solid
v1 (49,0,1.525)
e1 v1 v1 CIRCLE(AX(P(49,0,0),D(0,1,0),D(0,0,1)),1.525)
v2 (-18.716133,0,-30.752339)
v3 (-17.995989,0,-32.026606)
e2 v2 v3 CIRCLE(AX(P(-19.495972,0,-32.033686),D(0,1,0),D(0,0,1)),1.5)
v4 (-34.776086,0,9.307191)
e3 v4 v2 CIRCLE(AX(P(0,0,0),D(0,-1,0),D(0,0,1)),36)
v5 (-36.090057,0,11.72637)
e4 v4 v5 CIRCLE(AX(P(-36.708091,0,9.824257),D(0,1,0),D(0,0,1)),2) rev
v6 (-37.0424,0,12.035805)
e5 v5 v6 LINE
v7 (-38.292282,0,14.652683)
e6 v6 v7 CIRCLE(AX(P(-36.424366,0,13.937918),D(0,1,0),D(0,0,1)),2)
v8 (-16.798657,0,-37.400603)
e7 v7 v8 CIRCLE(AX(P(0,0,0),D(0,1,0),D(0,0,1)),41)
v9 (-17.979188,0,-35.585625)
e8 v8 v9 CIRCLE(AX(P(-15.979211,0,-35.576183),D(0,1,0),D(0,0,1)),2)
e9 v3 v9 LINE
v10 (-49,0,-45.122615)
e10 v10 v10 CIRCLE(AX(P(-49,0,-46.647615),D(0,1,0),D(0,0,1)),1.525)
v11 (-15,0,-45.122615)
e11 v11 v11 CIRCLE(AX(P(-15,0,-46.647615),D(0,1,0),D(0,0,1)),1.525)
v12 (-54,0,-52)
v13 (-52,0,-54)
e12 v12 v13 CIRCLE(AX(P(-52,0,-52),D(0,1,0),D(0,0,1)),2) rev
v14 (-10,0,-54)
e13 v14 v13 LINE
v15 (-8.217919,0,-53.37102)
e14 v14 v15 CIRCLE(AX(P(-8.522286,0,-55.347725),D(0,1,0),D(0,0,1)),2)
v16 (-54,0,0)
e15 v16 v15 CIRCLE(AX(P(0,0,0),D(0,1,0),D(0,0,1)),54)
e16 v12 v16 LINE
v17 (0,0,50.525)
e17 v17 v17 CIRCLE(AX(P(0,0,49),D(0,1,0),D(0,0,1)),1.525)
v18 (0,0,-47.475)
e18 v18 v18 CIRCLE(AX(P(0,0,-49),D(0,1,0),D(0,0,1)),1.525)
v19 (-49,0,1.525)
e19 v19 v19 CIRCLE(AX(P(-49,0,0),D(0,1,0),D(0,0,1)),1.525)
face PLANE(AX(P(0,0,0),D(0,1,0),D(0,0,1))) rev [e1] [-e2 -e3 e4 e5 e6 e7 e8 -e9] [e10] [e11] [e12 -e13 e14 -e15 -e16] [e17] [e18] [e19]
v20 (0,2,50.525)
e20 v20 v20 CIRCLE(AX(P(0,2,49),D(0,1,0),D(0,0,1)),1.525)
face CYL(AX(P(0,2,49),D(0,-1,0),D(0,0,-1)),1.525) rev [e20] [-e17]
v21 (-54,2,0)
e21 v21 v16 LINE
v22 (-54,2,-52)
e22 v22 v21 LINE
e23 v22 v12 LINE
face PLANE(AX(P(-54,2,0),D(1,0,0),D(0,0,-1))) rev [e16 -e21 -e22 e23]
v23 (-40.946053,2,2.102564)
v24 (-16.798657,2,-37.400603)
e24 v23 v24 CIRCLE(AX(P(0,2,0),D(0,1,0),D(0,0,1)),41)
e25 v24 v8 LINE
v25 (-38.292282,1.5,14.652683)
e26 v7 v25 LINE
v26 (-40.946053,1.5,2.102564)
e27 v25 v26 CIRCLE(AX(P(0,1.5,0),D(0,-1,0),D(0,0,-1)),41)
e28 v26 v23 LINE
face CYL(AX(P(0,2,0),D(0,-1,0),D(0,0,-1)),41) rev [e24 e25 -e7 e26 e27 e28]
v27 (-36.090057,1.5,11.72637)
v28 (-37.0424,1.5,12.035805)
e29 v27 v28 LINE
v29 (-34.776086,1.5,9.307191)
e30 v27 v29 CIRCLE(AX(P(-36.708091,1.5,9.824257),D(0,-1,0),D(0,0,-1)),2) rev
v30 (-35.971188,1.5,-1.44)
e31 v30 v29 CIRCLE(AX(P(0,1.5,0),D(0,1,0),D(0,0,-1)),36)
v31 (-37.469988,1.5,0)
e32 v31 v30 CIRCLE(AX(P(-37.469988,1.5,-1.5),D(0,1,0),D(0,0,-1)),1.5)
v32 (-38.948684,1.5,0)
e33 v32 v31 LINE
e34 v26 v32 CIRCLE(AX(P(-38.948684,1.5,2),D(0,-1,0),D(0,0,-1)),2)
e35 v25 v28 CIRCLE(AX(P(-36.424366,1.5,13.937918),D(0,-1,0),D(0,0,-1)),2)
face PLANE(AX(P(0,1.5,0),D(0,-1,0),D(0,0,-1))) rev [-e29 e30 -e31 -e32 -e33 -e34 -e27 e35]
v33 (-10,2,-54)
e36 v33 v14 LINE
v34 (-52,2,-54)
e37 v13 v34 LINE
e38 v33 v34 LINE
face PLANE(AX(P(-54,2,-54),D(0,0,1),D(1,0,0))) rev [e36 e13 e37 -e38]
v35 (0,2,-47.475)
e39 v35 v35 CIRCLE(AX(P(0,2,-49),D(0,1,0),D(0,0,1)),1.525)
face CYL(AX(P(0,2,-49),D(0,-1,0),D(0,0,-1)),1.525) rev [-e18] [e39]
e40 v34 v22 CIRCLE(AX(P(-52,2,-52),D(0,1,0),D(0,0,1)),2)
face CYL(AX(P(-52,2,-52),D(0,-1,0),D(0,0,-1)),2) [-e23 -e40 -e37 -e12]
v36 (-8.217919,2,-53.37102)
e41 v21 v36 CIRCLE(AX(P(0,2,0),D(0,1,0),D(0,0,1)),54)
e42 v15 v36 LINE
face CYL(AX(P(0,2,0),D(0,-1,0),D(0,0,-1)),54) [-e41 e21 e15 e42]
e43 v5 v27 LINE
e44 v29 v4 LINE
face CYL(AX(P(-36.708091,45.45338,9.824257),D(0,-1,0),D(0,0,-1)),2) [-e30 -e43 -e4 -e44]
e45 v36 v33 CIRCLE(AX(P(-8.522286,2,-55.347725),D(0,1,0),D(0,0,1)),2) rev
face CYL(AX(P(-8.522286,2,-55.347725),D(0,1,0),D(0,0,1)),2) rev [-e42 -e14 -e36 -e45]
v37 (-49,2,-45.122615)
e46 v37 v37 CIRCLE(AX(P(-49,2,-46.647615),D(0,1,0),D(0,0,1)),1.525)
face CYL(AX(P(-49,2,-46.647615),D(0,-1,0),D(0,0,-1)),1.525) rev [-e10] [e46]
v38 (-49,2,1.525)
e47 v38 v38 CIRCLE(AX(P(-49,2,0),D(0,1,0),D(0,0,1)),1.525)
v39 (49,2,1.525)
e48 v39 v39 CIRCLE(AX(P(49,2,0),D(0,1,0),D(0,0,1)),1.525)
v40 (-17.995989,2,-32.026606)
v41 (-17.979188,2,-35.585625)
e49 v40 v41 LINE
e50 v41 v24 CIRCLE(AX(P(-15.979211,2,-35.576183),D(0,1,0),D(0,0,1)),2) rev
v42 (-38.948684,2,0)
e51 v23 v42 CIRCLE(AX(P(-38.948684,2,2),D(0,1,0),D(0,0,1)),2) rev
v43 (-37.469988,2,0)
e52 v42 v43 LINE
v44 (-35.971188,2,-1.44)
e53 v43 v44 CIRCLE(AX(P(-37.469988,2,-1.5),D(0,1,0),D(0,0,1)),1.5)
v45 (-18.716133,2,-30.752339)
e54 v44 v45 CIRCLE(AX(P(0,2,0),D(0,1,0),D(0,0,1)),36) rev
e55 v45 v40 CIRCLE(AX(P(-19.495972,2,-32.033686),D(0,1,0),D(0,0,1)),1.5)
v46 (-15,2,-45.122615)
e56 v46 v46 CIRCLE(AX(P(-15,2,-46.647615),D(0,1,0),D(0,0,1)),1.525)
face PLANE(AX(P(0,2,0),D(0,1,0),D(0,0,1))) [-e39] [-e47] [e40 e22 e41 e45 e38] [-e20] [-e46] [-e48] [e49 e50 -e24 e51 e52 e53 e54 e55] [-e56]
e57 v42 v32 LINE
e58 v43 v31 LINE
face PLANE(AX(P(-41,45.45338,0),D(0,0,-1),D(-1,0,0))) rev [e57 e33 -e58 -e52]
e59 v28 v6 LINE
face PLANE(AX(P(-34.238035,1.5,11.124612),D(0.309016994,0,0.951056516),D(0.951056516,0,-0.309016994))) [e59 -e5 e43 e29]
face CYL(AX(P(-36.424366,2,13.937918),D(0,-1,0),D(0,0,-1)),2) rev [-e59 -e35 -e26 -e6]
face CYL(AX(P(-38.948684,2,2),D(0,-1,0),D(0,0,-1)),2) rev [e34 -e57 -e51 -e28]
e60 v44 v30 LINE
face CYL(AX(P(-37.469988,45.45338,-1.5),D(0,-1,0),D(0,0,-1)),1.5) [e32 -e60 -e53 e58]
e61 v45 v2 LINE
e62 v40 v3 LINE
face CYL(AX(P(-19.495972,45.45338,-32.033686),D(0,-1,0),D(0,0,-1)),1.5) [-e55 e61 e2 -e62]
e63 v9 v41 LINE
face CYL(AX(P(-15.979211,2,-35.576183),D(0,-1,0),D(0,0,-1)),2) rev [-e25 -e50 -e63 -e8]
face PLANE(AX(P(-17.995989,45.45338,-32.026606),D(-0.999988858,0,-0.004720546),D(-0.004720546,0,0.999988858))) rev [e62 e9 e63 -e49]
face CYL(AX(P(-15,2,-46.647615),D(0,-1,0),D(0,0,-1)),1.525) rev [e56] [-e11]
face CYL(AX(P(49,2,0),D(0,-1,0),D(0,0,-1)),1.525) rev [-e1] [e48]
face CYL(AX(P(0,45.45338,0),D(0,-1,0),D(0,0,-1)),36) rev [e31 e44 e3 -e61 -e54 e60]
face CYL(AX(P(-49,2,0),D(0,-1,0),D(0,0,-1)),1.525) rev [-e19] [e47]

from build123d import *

# Parameters (mm, degrees)
SKETCH_1_R      = 41
SKETCH_1_R_2    = 1.525
EXTRUDE_1_DEPTH = 2
EXTRUDE_3_DEPTH = 2
FILLET_1_R      = 2
FILLET_2_R      = 2
EXTRUDE_5_DEPTH = 1.5
FILLET_3_R      = 2


with BuildPart() as part:
    # 草图1 → 凸台-拉伸1 (new body)
    with BuildSketch(Plane(origin=(0, 0, 0), x_dir=(1, 0, 0), z_dir=(0, 1, 0))):
        with BuildLine():
            Line((-54, 0), (-54, 54))
            Line((-54, 54), (-10, 54))
            Line((-10, 54), (-10, 53.065996646))
            ThreePointArc((-10, 53.065996646), (41.569219382, -34.467375879), (-54, 0))
        make_face()
        with Locations(Location((0, 0, 0), (0, 0, 270))):
            Circle(SKETCH_1_R, mode=Mode.SUBTRACT)
        with Locations(Location((-15, 46.647615159, 0), (0, 0, 270))):
            Circle(SKETCH_1_R_2, mode=Mode.SUBTRACT)
        with Locations(Location((0, 49, 0), (0, 0, 270))):
            Circle(SKETCH_1_R_2, mode=Mode.SUBTRACT)
        with Locations(Location((49, 0, 0), (0, 0, 270))):
            Circle(SKETCH_1_R_2, mode=Mode.SUBTRACT)
        with Locations(Location((0, -49, 0), (0, 0, 270))):
            Circle(SKETCH_1_R_2, mode=Mode.SUBTRACT)
        with Locations(Location((-49, 0, 0), (0, 0, 270))):
            Circle(SKETCH_1_R_2, mode=Mode.SUBTRACT)
        with Locations(Location((-49, 46.647615159, 0), (0, 0, 270))):
            Circle(SKETCH_1_R_2, mode=Mode.SUBTRACT)
    extrude(amount=EXTRUDE_1_DEPTH)

    # 草图2 → 凸台-拉伸3 (add)
    with BuildSketch(Plane(origin=(0, 0, 0), x_dir=(1, 0, 0), z_dir=(0, 1, 0))):
        with BuildLine():
            Line((-41, 0), (-37.46998799, 0))
            ThreePointArc((-37.46998799, 0), (-36.430757506, 0.418334617), (-35.971188471, 1.44))
            ThreePointArc((-35.971188471, 1.44), (-31.023847214, 18.262554696), (-18.716133348, 30.752338976))
            ThreePointArc((-18.716133348, 30.752338976), (-18.190087037, 31.295672989), (-17.99598895, 32.026605615))
            Line((-17.99598895, 32.026605615), (-17.973217018, 36.850555898))
            ThreePointArc((-17.973217018, 36.850555898), (-34.769971942, 21.726689834), (-41, 0))
        make_face()
    extrude(amount=EXTRUDE_3_DEPTH)

    # 圆角1
    fillet_1_edges = [part.edges().sort_by_distance(p)[0] for p in [
        (-17.973217018, 1, -36.850555898),
        (-41, 1, 0),
    ]]
    fillet(fillet_1_edges, radius=FILLET_1_R)

    # 圆角2
    # the kernel refuses this fillet: 2 mm, written as the material it adds along each edge
    with BuildSketch(Plane(origin=(-10, 0, -53.065996646), x_dir=(0, 0, -1), z_dir=(0, 1, 0))) as fillet_2_piece_1:
        with BuildLine():
            CenterArc((2.281728124, -1.477713756), FILLET_2_R, 132.365870045, 56.387625402)
            ThreePointArc((0.305023668, -1.782081122), (0.159970683, -0.889763893), (0, 0))
            Line((0, 0), (0.934003354, 0))
        make_face()
    extrude(amount=2)
    # the kernel refuses this fillet: 2 mm, written as the material it takes off along each edge
    with BuildSketch(Plane(origin=(-54, -5, -54), x_dir=(0, 0, 1), z_dir=(0, 1, 0))) as fillet_2_2_piece_1:
        with BuildLine():
            CenterArc((FILLET_2_R, FILLET_2_R), FILLET_2_R, 180, 90)
            Line((0, FILLET_2_R), (0, 0))
            Line((0, 0), (FILLET_2_R, 0))
        make_face()
    extrude(amount=12, mode=Mode.SUBTRACT)

    # 草图4 → 凸台-拉伸5 (add)
    with BuildSketch(Plane.XZ):
        with BuildLine():
            Line((-38.948684188, 0), (-37.46998799, 0))
            ThreePointArc((-37.46998799, 0), (-36.430757506, -0.418334617), (-35.971188471, -1.44))
            ThreePointArc((-35.971188471, -1.44), (-35.662320704, 4.919235918), (-34.238034587, 11.124611797))
            Line((-34.238034587, 11.124611797), (-38.993317168, 12.669696769))
            ThreePointArc((-38.993317168, 12.669696769), (-40.317388101, 7.450383664), (-40.946052608, 2.102564103))
            ThreePointArc((-40.946052608, 2.102564103), (-40.398706292, 0.622525537), (-38.948684188, 0))
        make_face()
    extrude(amount=-EXTRUDE_5_DEPTH)

    # 圆角3
    fillet_3_edges = [part.edges().sort_by_distance(p)[0] for p in [
        (-38.993317168, 0.75, 12.669696769),
        (-34.238034587, 0.75, 11.124611797),
    ]]
    fillet(fillet_3_edges, radius=FILLET_3_R)


solid = part.part
